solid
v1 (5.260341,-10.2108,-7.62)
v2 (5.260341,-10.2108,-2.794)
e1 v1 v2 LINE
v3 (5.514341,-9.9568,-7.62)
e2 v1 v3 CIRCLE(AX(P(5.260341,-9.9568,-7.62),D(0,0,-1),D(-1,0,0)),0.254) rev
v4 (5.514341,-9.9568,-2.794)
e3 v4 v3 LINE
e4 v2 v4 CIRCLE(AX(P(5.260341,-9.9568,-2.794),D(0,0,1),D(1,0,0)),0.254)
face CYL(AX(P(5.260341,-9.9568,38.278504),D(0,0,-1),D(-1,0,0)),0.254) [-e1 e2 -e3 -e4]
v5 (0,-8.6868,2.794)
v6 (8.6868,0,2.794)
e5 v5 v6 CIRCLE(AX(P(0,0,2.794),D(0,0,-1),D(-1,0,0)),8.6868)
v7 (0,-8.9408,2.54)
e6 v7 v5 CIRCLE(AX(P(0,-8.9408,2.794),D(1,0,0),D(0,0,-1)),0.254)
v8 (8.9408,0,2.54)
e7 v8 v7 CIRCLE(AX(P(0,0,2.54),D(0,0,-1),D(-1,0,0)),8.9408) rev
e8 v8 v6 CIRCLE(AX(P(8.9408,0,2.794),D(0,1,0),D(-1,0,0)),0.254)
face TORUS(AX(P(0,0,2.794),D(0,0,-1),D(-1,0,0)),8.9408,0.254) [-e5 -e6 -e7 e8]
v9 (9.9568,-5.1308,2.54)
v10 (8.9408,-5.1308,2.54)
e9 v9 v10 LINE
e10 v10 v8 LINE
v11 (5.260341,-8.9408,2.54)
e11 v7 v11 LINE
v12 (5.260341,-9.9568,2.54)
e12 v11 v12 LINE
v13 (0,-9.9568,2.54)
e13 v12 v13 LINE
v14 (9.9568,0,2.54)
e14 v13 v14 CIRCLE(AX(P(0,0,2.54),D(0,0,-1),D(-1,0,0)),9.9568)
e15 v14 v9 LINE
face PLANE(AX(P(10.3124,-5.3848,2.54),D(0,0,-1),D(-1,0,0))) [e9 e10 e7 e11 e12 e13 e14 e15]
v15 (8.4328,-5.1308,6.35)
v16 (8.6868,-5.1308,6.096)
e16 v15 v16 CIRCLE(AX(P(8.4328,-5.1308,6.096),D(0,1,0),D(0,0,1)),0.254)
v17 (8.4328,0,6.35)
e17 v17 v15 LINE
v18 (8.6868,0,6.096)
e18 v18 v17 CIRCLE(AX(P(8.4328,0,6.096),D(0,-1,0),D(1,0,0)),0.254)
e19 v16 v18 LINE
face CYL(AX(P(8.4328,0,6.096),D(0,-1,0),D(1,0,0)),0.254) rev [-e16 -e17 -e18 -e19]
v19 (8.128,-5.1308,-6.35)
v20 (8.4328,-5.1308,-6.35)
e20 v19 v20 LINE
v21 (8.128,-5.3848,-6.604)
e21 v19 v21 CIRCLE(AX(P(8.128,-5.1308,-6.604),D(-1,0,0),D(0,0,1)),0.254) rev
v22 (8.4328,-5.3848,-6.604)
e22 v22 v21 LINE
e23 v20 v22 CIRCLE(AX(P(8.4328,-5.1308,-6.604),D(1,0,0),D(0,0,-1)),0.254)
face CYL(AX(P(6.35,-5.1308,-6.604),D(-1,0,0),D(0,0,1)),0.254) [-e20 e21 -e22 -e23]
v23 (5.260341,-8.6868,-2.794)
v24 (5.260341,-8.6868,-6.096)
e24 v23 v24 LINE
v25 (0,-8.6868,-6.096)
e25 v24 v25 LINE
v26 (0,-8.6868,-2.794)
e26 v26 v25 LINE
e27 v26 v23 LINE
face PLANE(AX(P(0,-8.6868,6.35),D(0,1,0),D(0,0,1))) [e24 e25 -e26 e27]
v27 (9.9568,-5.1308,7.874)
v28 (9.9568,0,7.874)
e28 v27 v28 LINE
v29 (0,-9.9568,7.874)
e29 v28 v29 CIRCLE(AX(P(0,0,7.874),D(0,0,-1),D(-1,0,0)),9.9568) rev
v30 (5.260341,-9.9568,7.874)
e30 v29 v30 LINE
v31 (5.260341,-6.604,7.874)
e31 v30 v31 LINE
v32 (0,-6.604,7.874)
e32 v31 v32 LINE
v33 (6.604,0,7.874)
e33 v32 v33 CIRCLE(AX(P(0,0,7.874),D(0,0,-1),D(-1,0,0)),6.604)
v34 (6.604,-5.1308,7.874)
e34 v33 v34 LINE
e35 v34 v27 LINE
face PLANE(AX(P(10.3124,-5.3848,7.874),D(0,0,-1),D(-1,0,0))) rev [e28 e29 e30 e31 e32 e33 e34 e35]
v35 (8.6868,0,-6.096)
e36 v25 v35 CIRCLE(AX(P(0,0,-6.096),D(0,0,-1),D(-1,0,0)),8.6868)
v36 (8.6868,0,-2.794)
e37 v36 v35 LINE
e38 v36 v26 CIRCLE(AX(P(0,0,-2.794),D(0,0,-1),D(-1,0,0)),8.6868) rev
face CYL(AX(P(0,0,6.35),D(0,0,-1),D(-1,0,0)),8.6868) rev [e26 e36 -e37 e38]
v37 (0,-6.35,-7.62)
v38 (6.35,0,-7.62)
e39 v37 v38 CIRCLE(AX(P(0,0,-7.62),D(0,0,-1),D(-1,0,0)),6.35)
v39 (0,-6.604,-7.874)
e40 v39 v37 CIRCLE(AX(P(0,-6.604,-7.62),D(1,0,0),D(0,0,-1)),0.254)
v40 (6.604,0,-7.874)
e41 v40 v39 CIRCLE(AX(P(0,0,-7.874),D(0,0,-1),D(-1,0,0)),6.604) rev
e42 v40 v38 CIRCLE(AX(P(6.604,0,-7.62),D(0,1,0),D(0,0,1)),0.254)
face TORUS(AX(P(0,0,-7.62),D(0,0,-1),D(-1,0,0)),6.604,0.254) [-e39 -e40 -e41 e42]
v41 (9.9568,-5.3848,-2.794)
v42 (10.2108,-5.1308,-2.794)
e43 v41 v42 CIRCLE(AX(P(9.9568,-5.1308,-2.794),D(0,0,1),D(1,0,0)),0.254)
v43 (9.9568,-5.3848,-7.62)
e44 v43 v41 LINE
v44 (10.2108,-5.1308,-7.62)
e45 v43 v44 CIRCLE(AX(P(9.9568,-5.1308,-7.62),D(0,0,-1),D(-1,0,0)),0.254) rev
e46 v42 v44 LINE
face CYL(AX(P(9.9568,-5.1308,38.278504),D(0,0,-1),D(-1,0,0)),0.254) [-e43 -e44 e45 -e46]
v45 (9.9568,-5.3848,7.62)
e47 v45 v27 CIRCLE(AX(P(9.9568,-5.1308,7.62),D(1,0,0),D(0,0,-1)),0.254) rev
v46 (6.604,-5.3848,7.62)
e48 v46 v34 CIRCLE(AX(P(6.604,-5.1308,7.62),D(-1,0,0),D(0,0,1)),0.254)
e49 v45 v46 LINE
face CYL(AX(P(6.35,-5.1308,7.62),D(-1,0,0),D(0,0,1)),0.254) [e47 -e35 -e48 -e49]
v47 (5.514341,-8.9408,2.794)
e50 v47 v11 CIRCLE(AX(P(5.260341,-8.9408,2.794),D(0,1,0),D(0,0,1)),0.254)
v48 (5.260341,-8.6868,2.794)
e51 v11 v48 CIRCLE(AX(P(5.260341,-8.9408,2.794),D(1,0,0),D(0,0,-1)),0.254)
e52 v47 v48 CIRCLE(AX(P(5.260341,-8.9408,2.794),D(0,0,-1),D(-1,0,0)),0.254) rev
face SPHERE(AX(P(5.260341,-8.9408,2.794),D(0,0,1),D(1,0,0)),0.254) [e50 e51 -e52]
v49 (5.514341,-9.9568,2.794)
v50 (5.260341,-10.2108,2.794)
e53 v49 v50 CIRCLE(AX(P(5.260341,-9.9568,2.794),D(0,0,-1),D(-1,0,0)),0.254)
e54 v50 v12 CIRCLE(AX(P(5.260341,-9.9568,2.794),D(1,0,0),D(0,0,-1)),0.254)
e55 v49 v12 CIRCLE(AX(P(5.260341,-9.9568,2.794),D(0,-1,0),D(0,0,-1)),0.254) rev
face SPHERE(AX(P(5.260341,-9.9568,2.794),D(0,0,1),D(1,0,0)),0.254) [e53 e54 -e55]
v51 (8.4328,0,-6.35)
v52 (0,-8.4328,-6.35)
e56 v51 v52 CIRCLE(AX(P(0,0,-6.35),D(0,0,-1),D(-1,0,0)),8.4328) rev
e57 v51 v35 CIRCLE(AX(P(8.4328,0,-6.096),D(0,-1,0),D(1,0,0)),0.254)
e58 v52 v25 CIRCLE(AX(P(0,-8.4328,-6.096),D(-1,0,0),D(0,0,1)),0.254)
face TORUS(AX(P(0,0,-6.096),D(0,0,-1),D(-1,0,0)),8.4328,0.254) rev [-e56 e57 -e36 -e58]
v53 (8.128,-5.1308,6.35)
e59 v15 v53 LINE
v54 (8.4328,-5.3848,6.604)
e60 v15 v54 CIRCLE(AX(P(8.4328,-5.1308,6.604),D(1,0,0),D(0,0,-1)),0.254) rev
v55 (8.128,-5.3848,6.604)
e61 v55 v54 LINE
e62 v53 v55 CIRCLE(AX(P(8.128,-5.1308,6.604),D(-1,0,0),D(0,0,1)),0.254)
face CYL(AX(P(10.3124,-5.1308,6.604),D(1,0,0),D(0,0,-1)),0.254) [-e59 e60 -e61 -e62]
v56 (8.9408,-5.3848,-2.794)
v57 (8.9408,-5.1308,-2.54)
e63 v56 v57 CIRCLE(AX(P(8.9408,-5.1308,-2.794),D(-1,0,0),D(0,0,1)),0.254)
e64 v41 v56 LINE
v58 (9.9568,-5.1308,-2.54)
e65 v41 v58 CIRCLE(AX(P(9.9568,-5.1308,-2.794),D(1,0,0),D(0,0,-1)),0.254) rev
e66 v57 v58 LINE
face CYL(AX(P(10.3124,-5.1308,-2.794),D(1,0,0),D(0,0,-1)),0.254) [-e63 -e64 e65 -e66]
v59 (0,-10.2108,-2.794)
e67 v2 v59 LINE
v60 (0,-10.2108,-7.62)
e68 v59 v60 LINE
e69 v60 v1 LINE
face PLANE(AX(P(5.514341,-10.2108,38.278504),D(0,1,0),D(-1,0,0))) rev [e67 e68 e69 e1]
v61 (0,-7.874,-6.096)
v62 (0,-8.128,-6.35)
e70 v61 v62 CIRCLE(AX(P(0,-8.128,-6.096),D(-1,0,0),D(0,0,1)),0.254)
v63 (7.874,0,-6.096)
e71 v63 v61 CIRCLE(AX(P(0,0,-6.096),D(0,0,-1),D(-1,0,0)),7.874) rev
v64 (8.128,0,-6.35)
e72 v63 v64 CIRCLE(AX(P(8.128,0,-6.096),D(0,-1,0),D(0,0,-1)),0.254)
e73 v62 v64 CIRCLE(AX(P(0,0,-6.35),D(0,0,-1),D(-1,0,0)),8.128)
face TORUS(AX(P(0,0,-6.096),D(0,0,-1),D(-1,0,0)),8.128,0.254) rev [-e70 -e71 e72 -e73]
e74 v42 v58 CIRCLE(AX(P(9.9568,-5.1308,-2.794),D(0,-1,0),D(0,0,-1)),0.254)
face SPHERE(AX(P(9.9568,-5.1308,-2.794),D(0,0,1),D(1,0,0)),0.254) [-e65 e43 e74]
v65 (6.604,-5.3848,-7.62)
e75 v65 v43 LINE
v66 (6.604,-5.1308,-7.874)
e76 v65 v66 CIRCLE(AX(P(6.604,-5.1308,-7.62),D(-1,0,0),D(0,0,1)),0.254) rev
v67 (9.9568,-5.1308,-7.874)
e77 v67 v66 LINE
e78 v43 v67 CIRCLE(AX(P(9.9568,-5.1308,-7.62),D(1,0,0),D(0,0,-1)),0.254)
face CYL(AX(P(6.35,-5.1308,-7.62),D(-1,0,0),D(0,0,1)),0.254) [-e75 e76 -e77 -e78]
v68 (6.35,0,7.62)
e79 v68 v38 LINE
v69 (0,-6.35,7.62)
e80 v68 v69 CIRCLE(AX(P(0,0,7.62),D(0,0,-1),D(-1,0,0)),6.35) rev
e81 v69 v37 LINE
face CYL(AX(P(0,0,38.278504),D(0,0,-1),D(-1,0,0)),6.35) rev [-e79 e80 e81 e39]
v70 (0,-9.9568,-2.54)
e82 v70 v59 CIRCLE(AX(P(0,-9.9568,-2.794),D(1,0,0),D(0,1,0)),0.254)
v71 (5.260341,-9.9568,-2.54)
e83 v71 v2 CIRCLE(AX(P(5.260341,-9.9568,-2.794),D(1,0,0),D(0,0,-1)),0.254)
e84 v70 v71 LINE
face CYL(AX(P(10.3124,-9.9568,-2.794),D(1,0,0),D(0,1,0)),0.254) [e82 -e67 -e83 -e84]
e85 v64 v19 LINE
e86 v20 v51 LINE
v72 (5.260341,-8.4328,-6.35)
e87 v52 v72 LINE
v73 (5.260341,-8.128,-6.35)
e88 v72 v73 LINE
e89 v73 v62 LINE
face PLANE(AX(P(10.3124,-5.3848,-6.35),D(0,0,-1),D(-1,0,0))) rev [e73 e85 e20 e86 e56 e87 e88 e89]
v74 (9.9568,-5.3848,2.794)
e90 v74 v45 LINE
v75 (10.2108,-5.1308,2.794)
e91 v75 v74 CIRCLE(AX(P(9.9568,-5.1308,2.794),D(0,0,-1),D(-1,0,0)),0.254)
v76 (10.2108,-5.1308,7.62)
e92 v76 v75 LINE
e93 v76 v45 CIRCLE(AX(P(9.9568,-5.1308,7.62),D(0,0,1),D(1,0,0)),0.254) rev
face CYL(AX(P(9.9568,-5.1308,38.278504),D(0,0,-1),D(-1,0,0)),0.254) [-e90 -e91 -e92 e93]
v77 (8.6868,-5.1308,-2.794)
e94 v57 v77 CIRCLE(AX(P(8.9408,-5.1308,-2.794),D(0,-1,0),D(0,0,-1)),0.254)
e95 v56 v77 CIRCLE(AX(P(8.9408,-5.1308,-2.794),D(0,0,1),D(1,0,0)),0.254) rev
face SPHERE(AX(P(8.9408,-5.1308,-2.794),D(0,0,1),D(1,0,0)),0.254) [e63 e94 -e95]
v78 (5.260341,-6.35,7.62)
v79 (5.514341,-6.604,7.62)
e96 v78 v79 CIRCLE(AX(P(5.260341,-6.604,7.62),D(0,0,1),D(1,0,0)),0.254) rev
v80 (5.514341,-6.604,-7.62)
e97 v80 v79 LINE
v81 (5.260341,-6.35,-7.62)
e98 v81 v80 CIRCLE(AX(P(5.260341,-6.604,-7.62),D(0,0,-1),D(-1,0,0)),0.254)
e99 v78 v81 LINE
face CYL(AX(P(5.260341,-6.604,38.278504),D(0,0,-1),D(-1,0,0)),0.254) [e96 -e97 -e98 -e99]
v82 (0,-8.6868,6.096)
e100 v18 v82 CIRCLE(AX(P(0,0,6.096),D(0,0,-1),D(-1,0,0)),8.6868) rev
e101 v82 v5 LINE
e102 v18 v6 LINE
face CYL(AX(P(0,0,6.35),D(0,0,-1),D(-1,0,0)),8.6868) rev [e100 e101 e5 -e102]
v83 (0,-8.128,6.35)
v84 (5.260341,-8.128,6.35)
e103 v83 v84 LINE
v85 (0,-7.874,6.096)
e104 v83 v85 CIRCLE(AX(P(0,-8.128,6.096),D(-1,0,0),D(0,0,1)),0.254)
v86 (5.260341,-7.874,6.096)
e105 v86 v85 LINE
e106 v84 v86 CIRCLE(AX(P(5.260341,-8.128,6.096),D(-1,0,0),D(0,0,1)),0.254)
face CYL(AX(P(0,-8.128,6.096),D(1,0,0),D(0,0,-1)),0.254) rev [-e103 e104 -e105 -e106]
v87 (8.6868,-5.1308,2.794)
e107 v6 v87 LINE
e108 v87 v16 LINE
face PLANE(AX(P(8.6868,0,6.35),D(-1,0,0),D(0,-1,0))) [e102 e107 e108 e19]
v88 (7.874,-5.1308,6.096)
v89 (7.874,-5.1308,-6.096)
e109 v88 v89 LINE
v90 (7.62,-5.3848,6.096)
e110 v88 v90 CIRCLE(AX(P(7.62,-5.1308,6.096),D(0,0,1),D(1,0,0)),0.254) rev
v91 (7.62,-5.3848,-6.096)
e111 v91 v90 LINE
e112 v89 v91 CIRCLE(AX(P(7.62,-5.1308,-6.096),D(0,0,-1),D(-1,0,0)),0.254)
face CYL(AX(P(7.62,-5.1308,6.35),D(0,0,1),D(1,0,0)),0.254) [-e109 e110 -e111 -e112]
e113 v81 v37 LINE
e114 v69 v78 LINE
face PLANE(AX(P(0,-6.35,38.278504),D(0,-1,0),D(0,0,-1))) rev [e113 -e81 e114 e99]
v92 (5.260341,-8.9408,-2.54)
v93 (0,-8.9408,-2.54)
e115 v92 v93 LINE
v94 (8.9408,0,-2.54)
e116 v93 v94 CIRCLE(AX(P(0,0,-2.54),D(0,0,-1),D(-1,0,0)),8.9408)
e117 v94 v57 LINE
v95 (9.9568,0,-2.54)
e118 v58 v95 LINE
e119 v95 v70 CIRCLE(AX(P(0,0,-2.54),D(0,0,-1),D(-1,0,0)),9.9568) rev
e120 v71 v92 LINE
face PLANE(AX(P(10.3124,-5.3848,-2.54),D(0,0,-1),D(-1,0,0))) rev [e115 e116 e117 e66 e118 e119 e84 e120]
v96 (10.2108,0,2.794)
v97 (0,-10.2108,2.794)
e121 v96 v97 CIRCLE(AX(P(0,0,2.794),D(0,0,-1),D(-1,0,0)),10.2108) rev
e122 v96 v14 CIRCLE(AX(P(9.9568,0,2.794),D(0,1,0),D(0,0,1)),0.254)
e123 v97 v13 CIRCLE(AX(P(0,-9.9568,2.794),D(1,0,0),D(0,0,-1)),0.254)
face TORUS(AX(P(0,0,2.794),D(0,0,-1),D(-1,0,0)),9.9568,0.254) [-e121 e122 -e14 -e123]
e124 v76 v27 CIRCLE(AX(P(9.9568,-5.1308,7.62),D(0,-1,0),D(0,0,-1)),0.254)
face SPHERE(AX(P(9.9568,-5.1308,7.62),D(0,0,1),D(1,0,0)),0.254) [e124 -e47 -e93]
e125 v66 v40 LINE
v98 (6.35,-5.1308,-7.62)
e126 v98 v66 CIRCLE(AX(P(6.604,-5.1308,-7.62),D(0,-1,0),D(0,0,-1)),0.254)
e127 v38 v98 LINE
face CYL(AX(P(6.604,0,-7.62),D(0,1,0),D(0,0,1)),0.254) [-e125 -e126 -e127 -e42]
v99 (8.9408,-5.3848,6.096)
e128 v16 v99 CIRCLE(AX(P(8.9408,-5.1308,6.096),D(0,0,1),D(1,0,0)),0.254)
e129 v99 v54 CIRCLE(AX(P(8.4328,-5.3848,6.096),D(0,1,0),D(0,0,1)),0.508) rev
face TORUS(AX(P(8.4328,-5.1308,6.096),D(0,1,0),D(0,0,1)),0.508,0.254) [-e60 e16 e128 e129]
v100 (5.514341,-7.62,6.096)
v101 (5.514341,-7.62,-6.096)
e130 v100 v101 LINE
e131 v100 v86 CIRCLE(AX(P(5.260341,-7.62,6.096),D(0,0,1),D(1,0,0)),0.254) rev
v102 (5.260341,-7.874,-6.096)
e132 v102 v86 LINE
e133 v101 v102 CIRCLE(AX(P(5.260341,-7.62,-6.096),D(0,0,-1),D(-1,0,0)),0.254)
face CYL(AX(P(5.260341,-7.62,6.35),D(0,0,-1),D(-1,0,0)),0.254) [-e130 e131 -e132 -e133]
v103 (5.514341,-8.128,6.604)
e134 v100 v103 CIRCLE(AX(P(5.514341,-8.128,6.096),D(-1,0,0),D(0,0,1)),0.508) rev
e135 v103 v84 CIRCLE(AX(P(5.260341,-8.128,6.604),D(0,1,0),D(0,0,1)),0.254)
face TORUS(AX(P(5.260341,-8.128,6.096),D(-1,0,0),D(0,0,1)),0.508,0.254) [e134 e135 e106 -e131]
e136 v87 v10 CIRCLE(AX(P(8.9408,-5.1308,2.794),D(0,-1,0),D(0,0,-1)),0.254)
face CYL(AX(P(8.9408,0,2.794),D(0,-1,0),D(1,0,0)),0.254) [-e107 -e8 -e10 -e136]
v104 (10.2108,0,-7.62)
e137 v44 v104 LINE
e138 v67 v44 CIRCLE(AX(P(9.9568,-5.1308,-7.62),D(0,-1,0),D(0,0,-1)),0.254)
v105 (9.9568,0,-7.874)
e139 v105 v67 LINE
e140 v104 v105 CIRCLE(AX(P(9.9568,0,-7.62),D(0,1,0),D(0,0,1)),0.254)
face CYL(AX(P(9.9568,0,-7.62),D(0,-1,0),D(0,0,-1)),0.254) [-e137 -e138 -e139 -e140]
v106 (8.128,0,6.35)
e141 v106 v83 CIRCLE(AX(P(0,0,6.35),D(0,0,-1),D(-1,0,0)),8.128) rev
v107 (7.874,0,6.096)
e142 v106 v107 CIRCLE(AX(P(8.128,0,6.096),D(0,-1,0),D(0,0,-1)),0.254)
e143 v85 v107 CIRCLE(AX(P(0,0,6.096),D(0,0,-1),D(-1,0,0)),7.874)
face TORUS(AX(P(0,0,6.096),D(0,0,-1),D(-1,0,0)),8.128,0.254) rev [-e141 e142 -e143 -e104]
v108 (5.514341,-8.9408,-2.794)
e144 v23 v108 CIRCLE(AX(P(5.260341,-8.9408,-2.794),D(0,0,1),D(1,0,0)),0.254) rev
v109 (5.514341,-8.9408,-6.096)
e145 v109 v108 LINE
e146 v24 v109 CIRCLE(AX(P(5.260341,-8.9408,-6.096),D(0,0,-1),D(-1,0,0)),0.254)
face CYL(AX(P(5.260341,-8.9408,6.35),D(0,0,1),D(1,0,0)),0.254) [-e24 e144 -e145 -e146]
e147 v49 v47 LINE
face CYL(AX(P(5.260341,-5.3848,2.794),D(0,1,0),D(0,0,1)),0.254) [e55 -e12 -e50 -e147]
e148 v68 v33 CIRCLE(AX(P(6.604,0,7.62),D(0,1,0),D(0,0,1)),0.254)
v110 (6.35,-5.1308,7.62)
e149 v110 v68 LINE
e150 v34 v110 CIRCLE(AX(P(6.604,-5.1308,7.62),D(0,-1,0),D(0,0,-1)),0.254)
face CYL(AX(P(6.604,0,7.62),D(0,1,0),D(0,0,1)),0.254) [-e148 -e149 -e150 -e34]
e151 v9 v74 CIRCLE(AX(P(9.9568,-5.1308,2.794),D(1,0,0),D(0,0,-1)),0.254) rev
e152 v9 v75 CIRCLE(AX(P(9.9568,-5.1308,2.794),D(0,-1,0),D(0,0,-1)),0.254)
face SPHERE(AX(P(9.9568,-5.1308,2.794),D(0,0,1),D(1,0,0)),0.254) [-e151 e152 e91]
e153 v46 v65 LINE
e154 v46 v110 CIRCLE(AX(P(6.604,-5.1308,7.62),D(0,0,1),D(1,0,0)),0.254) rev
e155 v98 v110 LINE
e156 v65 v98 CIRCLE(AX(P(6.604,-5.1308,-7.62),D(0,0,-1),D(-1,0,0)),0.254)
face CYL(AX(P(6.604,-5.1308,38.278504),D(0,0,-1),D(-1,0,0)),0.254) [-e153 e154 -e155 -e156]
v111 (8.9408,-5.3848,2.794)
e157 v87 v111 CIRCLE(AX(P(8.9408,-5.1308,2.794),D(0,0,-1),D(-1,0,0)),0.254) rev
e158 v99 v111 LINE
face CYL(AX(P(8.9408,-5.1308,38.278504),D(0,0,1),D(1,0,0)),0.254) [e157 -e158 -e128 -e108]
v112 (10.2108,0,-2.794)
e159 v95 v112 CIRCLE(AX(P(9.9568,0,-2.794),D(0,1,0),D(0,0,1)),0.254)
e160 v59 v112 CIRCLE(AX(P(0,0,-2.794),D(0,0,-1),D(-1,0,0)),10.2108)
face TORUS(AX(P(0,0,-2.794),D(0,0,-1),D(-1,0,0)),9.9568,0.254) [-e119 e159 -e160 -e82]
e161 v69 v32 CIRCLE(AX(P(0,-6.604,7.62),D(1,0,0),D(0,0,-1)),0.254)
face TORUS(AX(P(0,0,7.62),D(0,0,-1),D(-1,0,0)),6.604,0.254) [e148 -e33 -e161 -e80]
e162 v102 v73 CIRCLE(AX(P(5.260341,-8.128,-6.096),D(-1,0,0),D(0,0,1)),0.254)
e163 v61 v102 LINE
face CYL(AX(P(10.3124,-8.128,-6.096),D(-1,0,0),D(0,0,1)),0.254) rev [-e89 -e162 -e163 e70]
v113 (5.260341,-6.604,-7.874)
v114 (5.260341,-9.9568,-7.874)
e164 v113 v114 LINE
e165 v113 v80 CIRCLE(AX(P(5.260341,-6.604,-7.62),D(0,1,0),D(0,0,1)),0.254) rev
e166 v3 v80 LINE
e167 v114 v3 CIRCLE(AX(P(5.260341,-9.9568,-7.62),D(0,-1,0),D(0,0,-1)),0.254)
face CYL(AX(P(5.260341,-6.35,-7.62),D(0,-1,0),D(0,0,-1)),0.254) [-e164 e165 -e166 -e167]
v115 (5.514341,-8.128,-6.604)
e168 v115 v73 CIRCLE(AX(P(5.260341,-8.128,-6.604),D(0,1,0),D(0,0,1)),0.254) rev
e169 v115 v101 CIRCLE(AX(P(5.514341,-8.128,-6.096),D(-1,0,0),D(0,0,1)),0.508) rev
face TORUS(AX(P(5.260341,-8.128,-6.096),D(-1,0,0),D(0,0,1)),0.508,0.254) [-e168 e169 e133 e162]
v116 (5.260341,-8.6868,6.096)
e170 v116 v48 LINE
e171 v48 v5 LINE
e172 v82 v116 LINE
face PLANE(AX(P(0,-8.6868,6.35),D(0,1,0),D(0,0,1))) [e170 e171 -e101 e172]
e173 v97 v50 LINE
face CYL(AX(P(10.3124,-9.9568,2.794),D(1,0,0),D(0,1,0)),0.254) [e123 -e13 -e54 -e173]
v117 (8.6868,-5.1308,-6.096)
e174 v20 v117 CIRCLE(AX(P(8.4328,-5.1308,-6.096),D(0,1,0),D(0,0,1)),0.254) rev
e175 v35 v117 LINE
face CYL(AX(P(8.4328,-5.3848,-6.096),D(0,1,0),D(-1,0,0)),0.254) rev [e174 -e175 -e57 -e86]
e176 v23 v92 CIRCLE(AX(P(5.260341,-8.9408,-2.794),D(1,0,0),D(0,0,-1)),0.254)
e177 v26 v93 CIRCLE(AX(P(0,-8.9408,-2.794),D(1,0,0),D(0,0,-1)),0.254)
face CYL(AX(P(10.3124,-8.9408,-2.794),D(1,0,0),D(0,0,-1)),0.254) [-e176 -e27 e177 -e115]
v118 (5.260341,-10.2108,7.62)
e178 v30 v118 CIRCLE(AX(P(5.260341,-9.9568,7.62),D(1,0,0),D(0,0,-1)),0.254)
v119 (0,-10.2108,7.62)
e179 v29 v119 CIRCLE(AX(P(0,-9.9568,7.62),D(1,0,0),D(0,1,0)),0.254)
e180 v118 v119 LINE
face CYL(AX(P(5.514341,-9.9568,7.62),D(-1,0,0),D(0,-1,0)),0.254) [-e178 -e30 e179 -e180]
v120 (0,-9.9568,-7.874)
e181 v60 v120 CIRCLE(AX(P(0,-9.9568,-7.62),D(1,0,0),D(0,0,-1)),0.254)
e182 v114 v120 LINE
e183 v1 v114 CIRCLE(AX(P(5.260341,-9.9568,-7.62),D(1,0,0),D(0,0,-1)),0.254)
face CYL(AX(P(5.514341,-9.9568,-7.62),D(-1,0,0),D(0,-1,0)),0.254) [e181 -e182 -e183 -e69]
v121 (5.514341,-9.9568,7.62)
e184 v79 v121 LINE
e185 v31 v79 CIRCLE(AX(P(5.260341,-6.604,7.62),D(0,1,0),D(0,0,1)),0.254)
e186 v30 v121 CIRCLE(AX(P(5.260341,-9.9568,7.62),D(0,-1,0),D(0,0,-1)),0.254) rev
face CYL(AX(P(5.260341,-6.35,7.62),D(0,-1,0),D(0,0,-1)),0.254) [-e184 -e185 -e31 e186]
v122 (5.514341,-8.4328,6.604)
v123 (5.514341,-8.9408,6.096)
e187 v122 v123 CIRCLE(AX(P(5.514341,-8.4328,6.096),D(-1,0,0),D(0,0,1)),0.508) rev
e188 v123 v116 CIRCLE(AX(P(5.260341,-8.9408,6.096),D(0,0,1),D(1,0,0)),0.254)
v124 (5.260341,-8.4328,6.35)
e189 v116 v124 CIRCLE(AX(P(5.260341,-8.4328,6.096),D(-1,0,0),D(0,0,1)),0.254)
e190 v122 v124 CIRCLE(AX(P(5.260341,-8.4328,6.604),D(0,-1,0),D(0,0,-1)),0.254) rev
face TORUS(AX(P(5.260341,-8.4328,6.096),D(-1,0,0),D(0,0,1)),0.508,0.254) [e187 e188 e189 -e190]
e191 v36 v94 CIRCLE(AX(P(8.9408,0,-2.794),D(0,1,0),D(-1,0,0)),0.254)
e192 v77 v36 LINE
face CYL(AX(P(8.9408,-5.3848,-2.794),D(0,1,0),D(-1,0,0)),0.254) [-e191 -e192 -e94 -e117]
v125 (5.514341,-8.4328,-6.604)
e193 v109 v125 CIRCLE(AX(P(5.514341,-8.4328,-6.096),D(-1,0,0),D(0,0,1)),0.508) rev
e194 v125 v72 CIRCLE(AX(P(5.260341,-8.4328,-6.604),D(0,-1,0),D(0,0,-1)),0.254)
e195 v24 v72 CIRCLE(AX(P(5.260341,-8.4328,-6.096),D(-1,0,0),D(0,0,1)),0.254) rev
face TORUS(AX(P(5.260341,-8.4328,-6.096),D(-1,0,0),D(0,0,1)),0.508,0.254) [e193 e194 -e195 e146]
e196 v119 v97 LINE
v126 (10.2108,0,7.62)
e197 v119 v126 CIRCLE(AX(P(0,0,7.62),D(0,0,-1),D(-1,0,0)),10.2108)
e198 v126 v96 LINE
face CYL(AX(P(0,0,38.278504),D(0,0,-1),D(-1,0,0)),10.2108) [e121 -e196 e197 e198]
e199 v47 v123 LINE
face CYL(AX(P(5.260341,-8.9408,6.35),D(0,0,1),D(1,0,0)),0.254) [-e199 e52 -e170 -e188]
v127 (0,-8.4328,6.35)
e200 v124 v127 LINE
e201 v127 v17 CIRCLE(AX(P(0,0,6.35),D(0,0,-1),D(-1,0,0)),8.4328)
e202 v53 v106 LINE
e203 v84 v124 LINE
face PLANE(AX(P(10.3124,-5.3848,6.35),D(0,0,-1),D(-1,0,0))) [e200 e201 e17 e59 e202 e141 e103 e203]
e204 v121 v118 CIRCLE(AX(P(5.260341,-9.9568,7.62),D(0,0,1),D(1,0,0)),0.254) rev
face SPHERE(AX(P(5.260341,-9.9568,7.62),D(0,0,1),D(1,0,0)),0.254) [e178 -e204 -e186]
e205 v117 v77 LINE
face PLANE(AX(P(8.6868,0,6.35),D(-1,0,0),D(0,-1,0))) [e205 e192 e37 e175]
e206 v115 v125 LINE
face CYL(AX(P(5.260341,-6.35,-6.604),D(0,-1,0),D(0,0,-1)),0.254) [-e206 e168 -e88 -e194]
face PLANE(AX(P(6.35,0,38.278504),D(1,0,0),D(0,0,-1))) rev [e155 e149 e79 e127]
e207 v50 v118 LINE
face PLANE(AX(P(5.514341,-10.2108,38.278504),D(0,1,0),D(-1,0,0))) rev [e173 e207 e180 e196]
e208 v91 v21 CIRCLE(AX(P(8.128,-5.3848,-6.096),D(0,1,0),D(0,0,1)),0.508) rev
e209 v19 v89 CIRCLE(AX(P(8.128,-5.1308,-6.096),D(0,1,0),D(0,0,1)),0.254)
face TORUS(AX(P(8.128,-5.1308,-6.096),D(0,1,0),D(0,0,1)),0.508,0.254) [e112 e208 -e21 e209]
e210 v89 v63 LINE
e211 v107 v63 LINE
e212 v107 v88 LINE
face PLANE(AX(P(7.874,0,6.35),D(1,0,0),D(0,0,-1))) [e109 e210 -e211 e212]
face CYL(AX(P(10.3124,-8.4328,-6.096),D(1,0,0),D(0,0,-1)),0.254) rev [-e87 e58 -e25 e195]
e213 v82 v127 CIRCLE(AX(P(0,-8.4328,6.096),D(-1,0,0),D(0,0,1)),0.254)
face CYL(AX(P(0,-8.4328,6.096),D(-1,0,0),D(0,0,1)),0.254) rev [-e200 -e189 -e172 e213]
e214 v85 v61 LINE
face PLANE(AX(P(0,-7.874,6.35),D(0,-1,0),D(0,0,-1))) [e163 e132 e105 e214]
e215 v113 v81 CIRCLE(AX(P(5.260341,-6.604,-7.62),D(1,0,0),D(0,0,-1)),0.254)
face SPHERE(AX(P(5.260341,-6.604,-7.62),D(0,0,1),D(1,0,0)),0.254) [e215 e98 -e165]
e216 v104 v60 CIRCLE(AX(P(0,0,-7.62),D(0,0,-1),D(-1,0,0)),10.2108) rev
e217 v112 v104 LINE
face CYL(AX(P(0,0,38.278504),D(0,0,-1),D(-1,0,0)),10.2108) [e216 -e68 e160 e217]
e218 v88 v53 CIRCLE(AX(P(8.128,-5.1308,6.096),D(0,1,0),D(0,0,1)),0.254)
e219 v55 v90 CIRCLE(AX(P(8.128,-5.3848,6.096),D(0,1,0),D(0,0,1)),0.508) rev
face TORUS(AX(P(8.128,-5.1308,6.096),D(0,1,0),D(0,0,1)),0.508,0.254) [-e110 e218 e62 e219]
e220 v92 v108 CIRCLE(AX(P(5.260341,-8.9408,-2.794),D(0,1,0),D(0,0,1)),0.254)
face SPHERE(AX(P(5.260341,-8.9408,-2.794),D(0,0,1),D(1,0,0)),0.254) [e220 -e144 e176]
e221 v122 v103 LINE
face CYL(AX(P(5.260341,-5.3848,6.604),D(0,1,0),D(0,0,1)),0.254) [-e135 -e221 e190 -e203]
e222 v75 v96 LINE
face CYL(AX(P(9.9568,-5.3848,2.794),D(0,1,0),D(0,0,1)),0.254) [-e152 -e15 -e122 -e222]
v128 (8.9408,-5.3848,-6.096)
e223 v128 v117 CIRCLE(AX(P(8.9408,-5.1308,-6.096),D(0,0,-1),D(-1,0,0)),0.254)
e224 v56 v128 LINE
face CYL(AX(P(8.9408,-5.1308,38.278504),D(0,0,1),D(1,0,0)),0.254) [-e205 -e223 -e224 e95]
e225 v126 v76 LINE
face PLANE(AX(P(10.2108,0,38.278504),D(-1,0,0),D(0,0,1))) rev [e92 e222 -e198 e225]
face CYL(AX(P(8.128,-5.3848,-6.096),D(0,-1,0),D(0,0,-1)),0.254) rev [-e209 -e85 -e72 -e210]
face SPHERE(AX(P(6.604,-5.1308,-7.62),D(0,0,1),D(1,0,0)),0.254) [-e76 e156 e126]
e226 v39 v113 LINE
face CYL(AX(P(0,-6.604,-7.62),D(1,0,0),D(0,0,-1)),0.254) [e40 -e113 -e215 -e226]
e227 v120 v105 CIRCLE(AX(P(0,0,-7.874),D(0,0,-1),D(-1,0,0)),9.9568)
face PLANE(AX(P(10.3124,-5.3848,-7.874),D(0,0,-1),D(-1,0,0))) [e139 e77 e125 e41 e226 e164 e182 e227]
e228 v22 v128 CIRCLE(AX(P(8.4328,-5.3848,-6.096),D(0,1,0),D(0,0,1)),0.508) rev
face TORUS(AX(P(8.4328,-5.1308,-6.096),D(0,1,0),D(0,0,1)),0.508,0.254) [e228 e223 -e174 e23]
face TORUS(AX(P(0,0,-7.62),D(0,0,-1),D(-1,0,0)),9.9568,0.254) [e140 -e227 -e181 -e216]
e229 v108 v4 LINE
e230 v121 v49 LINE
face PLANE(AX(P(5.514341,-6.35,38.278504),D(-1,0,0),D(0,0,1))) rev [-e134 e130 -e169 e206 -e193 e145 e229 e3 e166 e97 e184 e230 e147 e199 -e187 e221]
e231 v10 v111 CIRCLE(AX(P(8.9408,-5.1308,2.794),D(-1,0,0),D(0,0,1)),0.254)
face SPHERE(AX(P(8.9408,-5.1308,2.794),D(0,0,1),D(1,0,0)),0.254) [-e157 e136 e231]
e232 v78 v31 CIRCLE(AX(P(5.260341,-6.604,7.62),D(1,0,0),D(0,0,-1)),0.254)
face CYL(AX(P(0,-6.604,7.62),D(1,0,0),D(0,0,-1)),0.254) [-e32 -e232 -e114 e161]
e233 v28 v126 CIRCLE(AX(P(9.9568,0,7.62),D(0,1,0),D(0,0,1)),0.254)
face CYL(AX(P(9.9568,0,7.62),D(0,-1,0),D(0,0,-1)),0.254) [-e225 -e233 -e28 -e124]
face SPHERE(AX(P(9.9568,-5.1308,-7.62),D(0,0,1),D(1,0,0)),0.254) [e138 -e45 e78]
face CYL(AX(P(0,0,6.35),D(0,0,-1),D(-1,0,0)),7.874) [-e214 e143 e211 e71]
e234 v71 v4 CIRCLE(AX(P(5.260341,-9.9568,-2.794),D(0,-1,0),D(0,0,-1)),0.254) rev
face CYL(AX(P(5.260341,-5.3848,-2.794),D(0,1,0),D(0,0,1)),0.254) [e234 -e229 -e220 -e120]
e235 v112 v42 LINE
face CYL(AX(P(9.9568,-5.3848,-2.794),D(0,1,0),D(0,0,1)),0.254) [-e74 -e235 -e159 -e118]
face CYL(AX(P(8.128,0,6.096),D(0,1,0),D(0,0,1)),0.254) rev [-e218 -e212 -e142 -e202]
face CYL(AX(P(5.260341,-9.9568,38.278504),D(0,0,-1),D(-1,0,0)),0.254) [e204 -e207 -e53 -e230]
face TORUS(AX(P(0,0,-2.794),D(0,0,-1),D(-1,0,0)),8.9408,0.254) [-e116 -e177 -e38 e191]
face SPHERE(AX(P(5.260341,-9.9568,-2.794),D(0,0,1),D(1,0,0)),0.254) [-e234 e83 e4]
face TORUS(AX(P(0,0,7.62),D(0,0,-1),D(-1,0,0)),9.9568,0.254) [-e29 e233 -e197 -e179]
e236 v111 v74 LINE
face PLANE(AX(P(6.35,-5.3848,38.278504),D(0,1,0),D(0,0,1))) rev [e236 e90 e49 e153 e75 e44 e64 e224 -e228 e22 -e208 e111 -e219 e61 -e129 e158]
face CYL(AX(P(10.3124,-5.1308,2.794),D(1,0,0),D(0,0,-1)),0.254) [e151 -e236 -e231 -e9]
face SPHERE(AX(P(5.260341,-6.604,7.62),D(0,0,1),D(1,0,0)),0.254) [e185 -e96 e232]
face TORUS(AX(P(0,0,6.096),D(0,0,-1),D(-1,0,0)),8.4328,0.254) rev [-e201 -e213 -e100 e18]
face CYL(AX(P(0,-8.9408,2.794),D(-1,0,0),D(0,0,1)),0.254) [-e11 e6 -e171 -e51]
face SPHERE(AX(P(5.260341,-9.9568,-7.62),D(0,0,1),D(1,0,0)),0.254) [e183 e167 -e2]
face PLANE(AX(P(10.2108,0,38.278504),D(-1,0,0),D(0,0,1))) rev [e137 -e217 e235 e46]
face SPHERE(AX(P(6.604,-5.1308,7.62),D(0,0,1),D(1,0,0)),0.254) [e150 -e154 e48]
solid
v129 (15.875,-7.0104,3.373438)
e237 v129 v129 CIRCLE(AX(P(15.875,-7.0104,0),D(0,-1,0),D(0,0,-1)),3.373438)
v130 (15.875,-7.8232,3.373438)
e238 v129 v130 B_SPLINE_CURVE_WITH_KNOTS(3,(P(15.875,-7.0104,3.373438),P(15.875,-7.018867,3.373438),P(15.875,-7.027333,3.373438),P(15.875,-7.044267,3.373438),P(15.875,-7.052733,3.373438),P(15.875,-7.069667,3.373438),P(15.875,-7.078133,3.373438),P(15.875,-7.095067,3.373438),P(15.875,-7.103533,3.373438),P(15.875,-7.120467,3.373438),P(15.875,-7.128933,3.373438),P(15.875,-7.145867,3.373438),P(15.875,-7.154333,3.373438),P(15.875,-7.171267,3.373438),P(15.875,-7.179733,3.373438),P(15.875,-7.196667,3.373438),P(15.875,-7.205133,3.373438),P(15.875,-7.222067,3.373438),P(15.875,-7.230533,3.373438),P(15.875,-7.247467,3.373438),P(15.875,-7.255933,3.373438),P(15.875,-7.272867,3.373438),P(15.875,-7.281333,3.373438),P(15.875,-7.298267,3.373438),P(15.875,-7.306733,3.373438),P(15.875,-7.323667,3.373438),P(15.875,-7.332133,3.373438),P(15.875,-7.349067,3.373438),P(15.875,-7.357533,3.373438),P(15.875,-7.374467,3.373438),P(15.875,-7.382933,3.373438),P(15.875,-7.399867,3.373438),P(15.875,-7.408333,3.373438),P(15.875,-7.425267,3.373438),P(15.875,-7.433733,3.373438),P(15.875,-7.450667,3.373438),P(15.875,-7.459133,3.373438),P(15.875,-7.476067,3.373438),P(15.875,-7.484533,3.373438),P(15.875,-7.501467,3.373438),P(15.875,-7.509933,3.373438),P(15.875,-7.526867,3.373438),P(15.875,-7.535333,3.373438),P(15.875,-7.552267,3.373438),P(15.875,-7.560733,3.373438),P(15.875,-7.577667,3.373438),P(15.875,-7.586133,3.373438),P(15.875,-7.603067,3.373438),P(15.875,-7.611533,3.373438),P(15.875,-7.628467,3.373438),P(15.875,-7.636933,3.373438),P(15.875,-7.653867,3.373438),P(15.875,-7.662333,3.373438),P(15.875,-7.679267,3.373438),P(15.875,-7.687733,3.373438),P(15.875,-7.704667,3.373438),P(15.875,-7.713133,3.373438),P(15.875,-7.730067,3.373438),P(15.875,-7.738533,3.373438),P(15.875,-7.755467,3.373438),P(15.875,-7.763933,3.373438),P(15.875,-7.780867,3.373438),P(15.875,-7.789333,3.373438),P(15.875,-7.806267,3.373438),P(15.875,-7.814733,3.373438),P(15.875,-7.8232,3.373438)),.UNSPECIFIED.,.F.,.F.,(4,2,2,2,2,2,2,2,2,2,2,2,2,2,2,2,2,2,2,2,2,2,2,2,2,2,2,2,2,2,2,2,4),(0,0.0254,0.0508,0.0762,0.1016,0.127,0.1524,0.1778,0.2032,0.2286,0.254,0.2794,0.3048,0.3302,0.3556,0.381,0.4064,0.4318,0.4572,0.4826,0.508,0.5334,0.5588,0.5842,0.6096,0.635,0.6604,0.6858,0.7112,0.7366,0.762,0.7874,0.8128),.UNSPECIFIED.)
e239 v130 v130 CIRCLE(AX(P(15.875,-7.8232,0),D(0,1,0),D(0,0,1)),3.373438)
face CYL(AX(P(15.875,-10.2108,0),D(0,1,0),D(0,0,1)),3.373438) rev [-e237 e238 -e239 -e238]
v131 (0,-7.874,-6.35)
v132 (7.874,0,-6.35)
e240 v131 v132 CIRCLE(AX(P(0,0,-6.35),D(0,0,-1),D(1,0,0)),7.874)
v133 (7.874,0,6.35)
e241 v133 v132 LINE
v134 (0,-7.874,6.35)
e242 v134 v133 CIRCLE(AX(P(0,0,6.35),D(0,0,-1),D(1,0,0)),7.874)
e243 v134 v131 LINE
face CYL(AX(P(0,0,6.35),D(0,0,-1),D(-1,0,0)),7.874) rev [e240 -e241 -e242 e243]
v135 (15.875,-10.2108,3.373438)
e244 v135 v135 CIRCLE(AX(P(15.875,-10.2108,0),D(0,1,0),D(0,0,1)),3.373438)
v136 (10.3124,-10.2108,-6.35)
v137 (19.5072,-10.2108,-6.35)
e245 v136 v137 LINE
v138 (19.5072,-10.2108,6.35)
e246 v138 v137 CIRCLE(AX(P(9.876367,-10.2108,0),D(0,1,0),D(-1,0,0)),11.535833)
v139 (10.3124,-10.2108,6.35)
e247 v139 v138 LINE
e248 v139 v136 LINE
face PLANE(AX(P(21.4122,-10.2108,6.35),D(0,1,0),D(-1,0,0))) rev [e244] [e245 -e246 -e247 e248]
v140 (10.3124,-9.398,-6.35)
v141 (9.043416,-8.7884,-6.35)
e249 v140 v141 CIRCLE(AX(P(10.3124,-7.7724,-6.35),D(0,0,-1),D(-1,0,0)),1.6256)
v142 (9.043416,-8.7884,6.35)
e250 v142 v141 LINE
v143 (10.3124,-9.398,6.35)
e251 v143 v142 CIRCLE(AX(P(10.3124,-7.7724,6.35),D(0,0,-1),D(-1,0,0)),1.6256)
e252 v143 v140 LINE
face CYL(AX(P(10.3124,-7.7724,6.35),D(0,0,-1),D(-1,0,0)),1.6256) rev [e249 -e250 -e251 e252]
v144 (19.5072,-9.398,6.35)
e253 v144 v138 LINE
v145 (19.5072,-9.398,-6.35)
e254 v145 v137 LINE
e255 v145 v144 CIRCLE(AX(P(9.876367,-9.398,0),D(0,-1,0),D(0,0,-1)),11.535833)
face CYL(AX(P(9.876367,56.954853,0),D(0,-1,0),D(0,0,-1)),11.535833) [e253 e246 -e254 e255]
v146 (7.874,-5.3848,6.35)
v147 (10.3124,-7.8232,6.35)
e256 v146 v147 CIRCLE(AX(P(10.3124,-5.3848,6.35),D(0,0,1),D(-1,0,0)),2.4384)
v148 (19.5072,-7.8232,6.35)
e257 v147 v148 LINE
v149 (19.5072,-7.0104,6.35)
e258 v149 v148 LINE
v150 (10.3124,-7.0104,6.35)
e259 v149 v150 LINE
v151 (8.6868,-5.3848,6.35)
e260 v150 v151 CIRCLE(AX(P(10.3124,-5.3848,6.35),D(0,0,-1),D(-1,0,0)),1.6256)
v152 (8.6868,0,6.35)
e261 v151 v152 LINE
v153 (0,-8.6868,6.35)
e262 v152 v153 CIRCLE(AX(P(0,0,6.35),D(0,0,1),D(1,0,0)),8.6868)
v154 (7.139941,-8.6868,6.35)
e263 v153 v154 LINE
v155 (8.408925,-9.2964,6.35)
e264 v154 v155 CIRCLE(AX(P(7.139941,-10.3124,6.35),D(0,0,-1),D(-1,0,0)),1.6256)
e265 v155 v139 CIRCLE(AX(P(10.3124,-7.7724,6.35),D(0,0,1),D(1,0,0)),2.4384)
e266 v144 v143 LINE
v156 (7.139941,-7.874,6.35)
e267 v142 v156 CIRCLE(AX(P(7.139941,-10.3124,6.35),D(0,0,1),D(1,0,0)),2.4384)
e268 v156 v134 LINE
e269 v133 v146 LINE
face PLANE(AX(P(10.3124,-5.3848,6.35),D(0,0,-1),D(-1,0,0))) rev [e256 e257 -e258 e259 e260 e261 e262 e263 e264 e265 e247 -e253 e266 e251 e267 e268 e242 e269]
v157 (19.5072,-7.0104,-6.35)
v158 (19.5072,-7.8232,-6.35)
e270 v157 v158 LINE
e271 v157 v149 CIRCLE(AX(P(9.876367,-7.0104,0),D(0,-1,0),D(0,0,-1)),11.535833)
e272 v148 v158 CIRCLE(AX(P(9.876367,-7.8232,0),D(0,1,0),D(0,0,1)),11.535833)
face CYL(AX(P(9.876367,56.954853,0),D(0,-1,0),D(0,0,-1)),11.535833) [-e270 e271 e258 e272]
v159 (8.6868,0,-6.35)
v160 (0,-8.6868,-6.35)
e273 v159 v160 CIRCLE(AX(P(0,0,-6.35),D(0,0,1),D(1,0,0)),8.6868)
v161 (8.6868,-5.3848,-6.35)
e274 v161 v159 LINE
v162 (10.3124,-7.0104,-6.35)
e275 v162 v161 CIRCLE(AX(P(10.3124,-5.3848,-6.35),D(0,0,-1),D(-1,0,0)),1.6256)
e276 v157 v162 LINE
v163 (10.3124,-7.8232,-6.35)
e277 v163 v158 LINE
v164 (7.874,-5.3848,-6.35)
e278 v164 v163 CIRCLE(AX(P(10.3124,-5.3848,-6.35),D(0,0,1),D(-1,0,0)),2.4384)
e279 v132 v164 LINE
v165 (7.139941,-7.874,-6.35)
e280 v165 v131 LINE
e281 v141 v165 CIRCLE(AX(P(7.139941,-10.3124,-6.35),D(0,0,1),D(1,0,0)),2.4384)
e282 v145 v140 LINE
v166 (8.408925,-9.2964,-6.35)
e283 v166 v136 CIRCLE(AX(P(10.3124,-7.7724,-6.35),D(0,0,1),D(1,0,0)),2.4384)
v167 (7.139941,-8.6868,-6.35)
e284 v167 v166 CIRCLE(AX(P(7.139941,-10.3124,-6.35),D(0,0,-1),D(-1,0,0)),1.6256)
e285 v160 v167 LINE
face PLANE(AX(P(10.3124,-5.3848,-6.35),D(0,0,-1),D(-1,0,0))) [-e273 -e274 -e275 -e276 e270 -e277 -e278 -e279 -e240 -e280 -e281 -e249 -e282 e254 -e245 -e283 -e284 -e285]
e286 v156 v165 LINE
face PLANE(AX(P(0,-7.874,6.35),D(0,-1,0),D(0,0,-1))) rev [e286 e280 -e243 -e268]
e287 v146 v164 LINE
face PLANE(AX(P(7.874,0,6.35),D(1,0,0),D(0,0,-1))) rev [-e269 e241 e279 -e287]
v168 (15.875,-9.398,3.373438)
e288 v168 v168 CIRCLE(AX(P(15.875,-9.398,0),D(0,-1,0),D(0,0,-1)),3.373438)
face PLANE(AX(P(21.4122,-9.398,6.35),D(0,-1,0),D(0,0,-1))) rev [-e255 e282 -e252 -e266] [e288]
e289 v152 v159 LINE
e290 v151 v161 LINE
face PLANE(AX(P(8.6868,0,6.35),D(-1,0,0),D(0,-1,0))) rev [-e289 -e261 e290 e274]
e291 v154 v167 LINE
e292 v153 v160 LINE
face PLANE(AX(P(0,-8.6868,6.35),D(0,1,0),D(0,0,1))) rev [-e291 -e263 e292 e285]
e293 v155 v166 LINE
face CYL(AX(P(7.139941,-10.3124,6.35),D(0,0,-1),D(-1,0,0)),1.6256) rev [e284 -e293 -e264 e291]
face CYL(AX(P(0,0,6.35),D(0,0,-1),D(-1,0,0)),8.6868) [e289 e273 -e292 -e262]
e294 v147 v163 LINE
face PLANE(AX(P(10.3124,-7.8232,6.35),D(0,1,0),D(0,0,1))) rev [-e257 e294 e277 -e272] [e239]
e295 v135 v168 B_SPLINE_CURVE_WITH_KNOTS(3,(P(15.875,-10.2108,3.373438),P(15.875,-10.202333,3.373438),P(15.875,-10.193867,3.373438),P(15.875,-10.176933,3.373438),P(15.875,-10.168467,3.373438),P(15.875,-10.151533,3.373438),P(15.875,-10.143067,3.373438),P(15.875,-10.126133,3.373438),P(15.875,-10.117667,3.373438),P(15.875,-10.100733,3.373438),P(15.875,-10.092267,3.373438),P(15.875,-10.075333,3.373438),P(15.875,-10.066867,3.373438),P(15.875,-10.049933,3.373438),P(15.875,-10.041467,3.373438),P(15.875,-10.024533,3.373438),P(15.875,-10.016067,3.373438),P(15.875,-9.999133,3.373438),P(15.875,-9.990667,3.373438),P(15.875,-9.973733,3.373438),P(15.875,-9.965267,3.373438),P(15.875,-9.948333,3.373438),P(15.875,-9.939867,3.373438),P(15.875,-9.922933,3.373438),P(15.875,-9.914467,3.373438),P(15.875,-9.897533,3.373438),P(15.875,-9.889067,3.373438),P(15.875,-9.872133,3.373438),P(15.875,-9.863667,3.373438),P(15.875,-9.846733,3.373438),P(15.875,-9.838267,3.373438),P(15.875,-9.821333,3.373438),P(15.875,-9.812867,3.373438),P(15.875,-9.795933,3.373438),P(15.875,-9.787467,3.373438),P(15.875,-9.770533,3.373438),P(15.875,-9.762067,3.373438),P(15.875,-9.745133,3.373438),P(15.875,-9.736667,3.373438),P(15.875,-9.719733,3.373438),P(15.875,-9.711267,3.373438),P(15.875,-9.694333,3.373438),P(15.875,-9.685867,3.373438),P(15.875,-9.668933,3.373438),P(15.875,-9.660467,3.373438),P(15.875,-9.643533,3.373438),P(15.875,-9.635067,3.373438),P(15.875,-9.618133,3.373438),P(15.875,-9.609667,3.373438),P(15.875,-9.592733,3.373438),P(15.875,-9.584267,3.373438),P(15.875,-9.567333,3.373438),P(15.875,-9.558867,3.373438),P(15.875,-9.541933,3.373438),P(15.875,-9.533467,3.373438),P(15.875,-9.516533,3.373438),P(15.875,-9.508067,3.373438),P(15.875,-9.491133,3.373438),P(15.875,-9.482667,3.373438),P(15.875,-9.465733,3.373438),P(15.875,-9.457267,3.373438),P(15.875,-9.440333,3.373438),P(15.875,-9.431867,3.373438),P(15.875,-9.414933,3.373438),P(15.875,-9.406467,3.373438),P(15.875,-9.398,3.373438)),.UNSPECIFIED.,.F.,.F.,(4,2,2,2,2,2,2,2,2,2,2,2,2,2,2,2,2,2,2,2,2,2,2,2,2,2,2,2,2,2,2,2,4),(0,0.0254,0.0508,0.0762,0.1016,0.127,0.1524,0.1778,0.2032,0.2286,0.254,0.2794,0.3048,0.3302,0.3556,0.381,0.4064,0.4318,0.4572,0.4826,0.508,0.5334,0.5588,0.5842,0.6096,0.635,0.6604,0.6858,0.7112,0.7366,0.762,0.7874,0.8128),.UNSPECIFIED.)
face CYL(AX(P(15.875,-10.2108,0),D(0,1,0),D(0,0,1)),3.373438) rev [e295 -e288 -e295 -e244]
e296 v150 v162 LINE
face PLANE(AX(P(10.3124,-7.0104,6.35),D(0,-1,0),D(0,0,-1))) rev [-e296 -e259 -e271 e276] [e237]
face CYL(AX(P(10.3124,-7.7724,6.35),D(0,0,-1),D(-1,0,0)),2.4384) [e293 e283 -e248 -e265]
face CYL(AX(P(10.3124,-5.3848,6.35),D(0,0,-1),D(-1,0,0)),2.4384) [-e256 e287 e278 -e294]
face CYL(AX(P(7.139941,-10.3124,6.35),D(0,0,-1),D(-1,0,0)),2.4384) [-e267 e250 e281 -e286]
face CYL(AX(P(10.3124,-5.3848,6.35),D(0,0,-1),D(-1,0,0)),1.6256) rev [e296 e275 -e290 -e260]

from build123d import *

# Parameters (mm, degrees)
BOSS_EXTRUDE1_DEPTH         = 6.35
SKETCH2_R                   = 3.3734375
CUT_EXTRUDE1_DEPTH          = 25.55738678
CUT_EXTRUDE3_DEPTH          = 25.55738678
CUT_EXTRUDE3_DEPTH_BACK     = 25.55738678
BOSS_EXTRUDE2_DEPTH         = 7.874
BOSS_EXTRUDE2_DEPTH_BACK    = 7.874
BODY_MOVE_COPY1_START       = -5.3848
BODY_MOVE_COPY1_OUTLINE_W   = 0.8128
BODY_MOVE_COPY1_OUTLINE_H   = 12.7
BODY_MOVE_COPY1_DEPTH       = 5.3848
BODY_MOVE_COPY1_START_2     = -8.7884
BODY_MOVE_COPY1_2_OUTLINE_W = 0.8128
BODY_MOVE_COPY1_2_OUTLINE_H = 12.7
BODY_MOVE_COPY1_2_DEPTH     = 0.1016
BODY_MOVE_COPY1_START_3     = -7.8232
BODY_MOVE_COPY1_3_OUTLINE_R = 3.3734375
BODY_MOVE_COPY1_3_DEPTH     = 2.4384
BODY_MOVE_COPY1_START_4     = -10.2108
BODY_MOVE_COPY1_4_OUTLINE_R = 3.3734375
BODY_MOVE_COPY1_4_DEPTH     = 2.3368
BODY_MOVE_COPY1_5_OUTLINE_W = 0.8128
BODY_MOVE_COPY1_5_OUTLINE_H = 12.7
BODY_MOVE_COPY1_5_DEPTH     = 7.874
BODY_MOVE_COPY1_START_5     = -6.35
BODY_MOVE_COPY1_6_DEPTH     = 12.7
BODY_MOVE_COPY1_7_DEPTH     = 12.7
CUT_EXTRUDE4_DEPTH          = 2.54
CUT_EXTRUDE4_DEPTH_BACK     = 2.54
FILLET1_R                   = 0.254


with BuildPart() as part:
    # Sketch1 → Boss-Extrude1 (new, symmetric)
    with BuildSketch(Plane.XY):
        with BuildLine():
            Line((0, -7.874), (7.139941017, -7.874))
            ThreePointArc((7.139941017, -7.874), (8.195799189, -8.114455942), (9.043416407, -8.7884))
            ThreePointArc((9.043416407, -8.7884), (9.608494552, -9.237696038), (10.3124, -9.398))
            Line((10.3124, -9.398), (21.4122, -9.398))
            Line((21.4122, -9.398), (21.4122, -10.2108))
            Line((21.4122, -10.2108), (10.3124, -10.2108))
            ThreePointArc((10.3124, -10.2108), (9.256541828, -9.970344058), (8.40892461, -9.2964))
            ThreePointArc((8.40892461, -9.2964), (7.843846465, -8.847103962), (7.139941017, -8.6868))
            Line((7.139941017, -8.6868), (0, -8.6868))
            ThreePointArc((0, -8.6868), (-6.142495187, 6.142495187), (8.6868, 0))
            Line((8.6868, 0), (8.6868, -5.3848))
            ThreePointArc((8.6868, -5.3848), (9.162927217, -6.534272783), (10.3124, -7.0104))
            Line((10.3124, -7.0104), (21.4122, -7.0104))
            Line((21.4122, -7.0104), (21.4122, -7.8232))
            Line((21.4122, -7.8232), (10.3124, -7.8232))
            ThreePointArc((10.3124, -7.8232), (8.588190825, -7.109009175), (7.874, -5.3848))
            Line((7.874, -5.3848), (7.874, 0))
            ThreePointArc((7.874, 0), (-5.567758795, 5.567758795), (0, -7.874))
        make_face()
    extrude(amount=BOSS_EXTRUDE1_DEPTH, both=True)

    # Sketch2 → Cut-Extrude1 (cut, through all)
    with BuildSketch(Plane(origin=(0, 0, 0), x_dir=(1, 0, 0), z_dir=(0, 1, 0))):
        with Locations(Location((15.875, 0, 0), (0, 0, 270))):
            Circle(SKETCH2_R)
    extrude(amount=-CUT_EXTRUDE1_DEPTH, mode=Mode.SUBTRACT)

    # Sketch4 → Cut-Extrude3 (cut, two sides: drawn at the far end of the back side and taken through both)
    with BuildSketch(Plane(origin=(0, 0, 0), x_dir=(1, 0, 0), z_dir=(0, 1, 0)).offset(-CUT_EXTRUDE3_DEPTH_BACK)):
        with BuildLine():
            Line((-20.04033962, 66.33043509), (19.5072, 6.35))
            ThreePointArc((19.5072, 6.35), (21.4122, 0), (19.5072, -6.35))
            Line((19.5072, -6.35), (-20.04033962, -66.33043509))
            Line((-20.04033962, -66.33043509), (123.649054332, -66.33043509))
            Line((123.649054332, -66.33043509), (123.649054332, 66.33043509))
            Line((123.649054332, 66.33043509), (-20.04033962, 66.33043509))
        make_face()
    extrude(amount=CUT_EXTRUDE3_DEPTH + CUT_EXTRUDE3_DEPTH_BACK, mode=Mode.SUBTRACT)


with BuildPart() as body_2:
    # Sketch5 → Boss-Extrude2 (new, two sides: drawn at the far end of the back side and taken through both)
    with BuildSketch(Plane.XY.offset(-BOSS_EXTRUDE2_DEPTH_BACK)):
        with BuildLine():
            Line((6.35, 0), (6.35, -5.3848))
            Line((6.35, -5.3848), (10.2108, -5.3848))
            Line((10.2108, -5.3848), (10.2108, 0))
            ThreePointArc((10.2108, 0), (-7.220125921, 7.220125921), (0, -10.2108))
            Line((0, -10.2108), (5.514341017, -10.2108))
            Line((5.514341017, -10.2108), (5.514341017, -6.35))
            Line((5.514341017, -6.35), (0, -6.35))
            ThreePointArc((0, -6.35), (-4.490128061, 4.490128061), (6.35, 0))
        make_face()
    extrude(amount=BOSS_EXTRUDE2_DEPTH + BOSS_EXTRUDE2_DEPTH_BACK)


with BuildPart() as body_3:
    # Body-Move/Copy1: read off the stored shape, not the designer's step
    # Body-Move/Copy1 outline → Body-Move/Copy1 (new body)
    with BuildSketch(Plane(origin=(0, 0, 0), x_dir=(1, 0, 0), z_dir=(0, 1, 0)).offset(BODY_MOVE_COPY1_START)):
        with Locations((8.2804, 0)):
            Rectangle(BODY_MOVE_COPY1_OUTLINE_W, BODY_MOVE_COPY1_OUTLINE_H)
    extrude(amount=BODY_MOVE_COPY1_DEPTH)

    # Body-Move_Copy1 2 outline → Body-Move_Copy1 2 (add)
    with BuildSketch(Plane(origin=(0, 0, 0), x_dir=(1, 0, 0), z_dir=(0, 1, 0)).offset(BODY_MOVE_COPY1_START_2)):
        with Locations((8.2804, 0)):
            Rectangle(BODY_MOVE_COPY1_2_OUTLINE_W, BODY_MOVE_COPY1_2_OUTLINE_H)
    extrude(amount=BODY_MOVE_COPY1_2_DEPTH)

    # Body-Move_Copy1 3 outline → Body-Move_Copy1 3 (add)
    with BuildSketch(Plane(origin=(0, 0, 0), x_dir=(1, 0, 0), z_dir=(0, 1, 0)).offset(BODY_MOVE_COPY1_START_3)):
        with BuildLine():
            ThreePointArc((19.5072, -6.35), (21.4122, 0), (19.5072, 6.35))
            Line((19.5072, 6.35), (7.874, 6.35))
            Line((7.874, 6.35), (7.874, -6.35))
            Line((7.874, -6.35), (19.5072, -6.35))
        make_face()
        with Locations((15.875, 0)):
            Circle(BODY_MOVE_COPY1_3_OUTLINE_R, mode=Mode.SUBTRACT)
    extrude(amount=BODY_MOVE_COPY1_3_DEPTH)

    # Body-Move_Copy1 4 outline → Body-Move_Copy1 4 (add)
    with BuildSketch(Plane(origin=(0, 0, 0), x_dir=(1, 0, 0), z_dir=(0, 1, 0)).offset(BODY_MOVE_COPY1_START_4)):
        with BuildLine():
            ThreePointArc((19.5072, -6.35), (21.4122, 0), (19.5072, 6.35))
            Line((19.5072, 6.35), (7.874, 6.35))
            Line((7.874, 6.35), (7.874, -6.35))
            Line((7.874, -6.35), (19.5072, -6.35))
        make_face()
        with Locations((15.875, 0)):
            Circle(BODY_MOVE_COPY1_4_OUTLINE_R, mode=Mode.SUBTRACT)
    extrude(amount=BODY_MOVE_COPY1_4_DEPTH)

    # Body-Move_Copy1 5 outline → Body-Move_Copy1 5 (add)
    with BuildSketch(Plane(origin=(0, 0, 0), x_dir=(1, 0, 0), z_dir=(0, 1, 0))):
        with Locations((8.2804, 0)):
            Rectangle(BODY_MOVE_COPY1_5_OUTLINE_W, BODY_MOVE_COPY1_5_OUTLINE_H)
    extrude(amount=BODY_MOVE_COPY1_5_DEPTH)

    # Body-Move_Copy1 6 outline → Body-Move_Copy1 6 (cut)
    with BuildSketch(Plane.XY.offset(BODY_MOVE_COPY1_START_5)):
        with BuildLine():
            ThreePointArc((8.6868, -5.3848), (9.162927217, -6.534272783), (10.3124, -7.0104))
            Line((10.3124, -7.0104), (23, -7.0104))
            Line((23, -7.0104), (23, -5.3848))
            Line((23, -5.3848), (8.6868, -5.3848))
        make_face()
        with BuildLine():
            ThreePointArc((7.873999999, 3.668871525), (8.481166118, 1.87891339), (8.6868, 0))
            Line((8.6868, 0), (8.6868, 7.874))
            Line((8.6868, 7.874), (7.874, 7.874))
            Line((7.874, 7.874), (7.873999999, 3.668871525))
        make_face()
        with BuildLine():
            Line((7.874, -7.8232), (10.3124, -7.8232))
            ThreePointArc((10.3124, -7.8232), (8.588190825, -7.109009175), (7.874, -5.3848))
            Line((7.874, -5.3848), (7.874, -7.8232))
        make_face()
        with BuildLine():
            Line((23, -9.398), (23, -7.874))
            Line((23, -7.874), (7.874, -7.874))
            Line((7.874, -7.874), (7.874, -7.987114647))
            ThreePointArc((7.874, -7.987114647), (8.51822308, -8.300899785), (9.043416407, -8.7884))
            ThreePointArc((9.043416407, -8.7884), (9.608494552, -9.237696038), (10.3124, -9.398))
            Line((10.3124, -9.398), (23, -9.398))
        make_face()
        with BuildLine():
            ThreePointArc((8.40892461, -9.2964), (8.164746446, -9.050516807), (7.874, -8.86197497))
            Line((7.874, -8.86197497), (7.874, -10.2108))
            Line((7.874, -10.2108), (10.3124, -10.2108))
            ThreePointArc((10.3124, -10.2108), (9.256541828, -9.970344058), (8.40892461, -9.2964))
        make_face()
    extrude(amount=BODY_MOVE_COPY1_6_DEPTH, mode=Mode.SUBTRACT)

    # Body-Move_Copy1 7 outline → Body-Move_Copy1 7 (add)
    with BuildSketch(Plane.XY.offset(BODY_MOVE_COPY1_START_5)):
        with BuildLine():
            Line((7.874, 0), (7.873999999, 3.668871525))
            ThreePointArc((7.873999999, 3.668871525), (-7.325682474, 4.668497675), (0, -8.6868))
            Line((0, -8.6868), (7.139941017, -8.6868))
            ThreePointArc((7.139941017, -8.6868), (7.517276697, -8.731200094), (7.874, -8.86197497))
            Line((7.874, -8.86197497), (7.874, -7.987114647))
            ThreePointArc((7.874, -7.987114647), (7.511302537, -7.902444568), (7.139941017, -7.874))
            Line((7.139941017, -7.874), (0, -7.874))
            ThreePointArc((0, -7.874), (-5.567758795, 5.567758795), (7.874, 0))
        make_face()
    extrude(amount=BODY_MOVE_COPY1_7_DEPTH)


with BuildPart() as body_2_1:
    add(body_2.part)

    # Combine1: cut body 3
    add(body_3.part, mode=Mode.SUBTRACT)

    # Sketch7 → Cut-Extrude4 (cut, two sides: drawn at the far end of the back side and taken through both)
    with BuildSketch(Plane.XY.offset(-CUT_EXTRUDE4_DEPTH_BACK)):
        with BuildLine():
            Line((7.874, 0), (7.874, -5.3848))
            Line((7.874, -5.3848), (10.2108, -5.3848))
            Line((10.2108, -5.3848), (10.2108, 0))
            ThreePointArc((10.2108, 0), (-7.220125921, 7.220125921), (0, -10.2108))
            Line((0, -10.2108), (5.514341017, -10.2108))
            Line((5.514341017, -10.2108), (5.514341017, -7.874))
            Line((5.514341017, -7.874), (0, -7.874))
            ThreePointArc((0, -7.874), (-5.567758795, 5.567758795), (7.874, 0))
        make_face()
    extrude(amount=CUT_EXTRUDE4_DEPTH + CUT_EXTRUDE4_DEPTH_BACK, mode=Mode.SUBTRACT)

    # Fillet1
    fillet1_edges = [body_2_1.edges().sort_by_distance(p)[0] for p in [
        (8.6868, -5.3848, -4.445),
        (5.514341017, -8.6868, -4.445),
        (10.2108, -5.3848, -5.207),
        (5.514341017, -10.2108, -5.207),
        (2.757170508, -8.6868, -2.54),
        (-7.325682474, 4.668497676, -2.54),
        (8.6868, -2.6924, -2.54),
        (5.514341017, -9.4488, -2.54),
        (5.514341017, -9.4488, 2.54),
        (2.757170508, -10.2108, 2.54),
        (2.757170508, -10.2108, -2.54),
        (-7.220125921, 7.220125921, 2.54),
        (-7.220125921, 7.220125921, -2.54),
        (10.2108, -2.6924, 2.54),
        (10.2108, -2.6924, -2.54),
        (9.4488, -5.3848, 2.54),
        (9.4488, -5.3848, -2.54),
        (2.757170508, -8.6868, 2.54),
        (-7.325682474, 4.668497676, 2.54),
        (8.6868, -2.6924, 2.54),
        (5.514341017, -6.35, 0),
        (2.757170508, -6.35, 7.874),
        (5.514341017, -10.2108, 5.207),
        (10.2108, -5.3848, 5.207),
        (6.35, -5.3848, 0),
        (5.514341017, -8.2804, 7.874),
        (2.757170508, -10.2108, 7.874),
        (-7.220125921, 7.220125921, 7.874),
        (10.2108, -2.6924, 7.874),
        (8.2804, -5.3848, 7.874),
        (6.35, -2.6924, 7.874),
        (-4.490128061, 4.490128061, 7.874),
        (6.35, -2.6924, -7.874),
        (8.2804, -5.3848, -7.874),
        (10.2108, -2.6924, -7.874),
        (-7.220125921, 7.220125921, -7.874),
        (2.757170508, -10.2108, -7.874),
        (5.514341017, -8.2804, -7.874),
        (2.757170508, -6.35, -7.874),
        (-4.490128061, 4.490128061, -7.874),
        (8.2804, -5.3848, -6.35),
        (8.2804, -5.3848, 6.35),
        (5.514341017, -7.874, 0),
        (5.514341017, -8.6868, 4.445),
        (2.757170508, -8.6868, -6.35),
        (2.757170508, -7.874, -6.35),
        (2.757170508, -7.874, 6.35),
        (-5.567758795, 5.567758795, 6.35),
        (7.874, -2.6924, 6.35),
        (8.6868, -2.6924, 6.35),
        (-7.325682474, 4.668497676, 6.35),
        (2.757170508, -8.6868, 6.35),
        (5.514341017, -8.2804, 6.35),
        (5.514341017, -8.2804, -6.35),
        (7.874, -5.3848, 0),
        (8.6868, -2.6924, -6.35),
        (8.6868, -5.3848, 4.445),
        (-7.325682474, 4.668497676, -6.35),
        (-5.567758795, 5.567758795, -6.35),
        (7.874, -2.6924, -6.35),
    ]]
    fillet(fillet1_edges, radius=FILLET1_R)


solid = Compound([part.part, body_2_1.part])
